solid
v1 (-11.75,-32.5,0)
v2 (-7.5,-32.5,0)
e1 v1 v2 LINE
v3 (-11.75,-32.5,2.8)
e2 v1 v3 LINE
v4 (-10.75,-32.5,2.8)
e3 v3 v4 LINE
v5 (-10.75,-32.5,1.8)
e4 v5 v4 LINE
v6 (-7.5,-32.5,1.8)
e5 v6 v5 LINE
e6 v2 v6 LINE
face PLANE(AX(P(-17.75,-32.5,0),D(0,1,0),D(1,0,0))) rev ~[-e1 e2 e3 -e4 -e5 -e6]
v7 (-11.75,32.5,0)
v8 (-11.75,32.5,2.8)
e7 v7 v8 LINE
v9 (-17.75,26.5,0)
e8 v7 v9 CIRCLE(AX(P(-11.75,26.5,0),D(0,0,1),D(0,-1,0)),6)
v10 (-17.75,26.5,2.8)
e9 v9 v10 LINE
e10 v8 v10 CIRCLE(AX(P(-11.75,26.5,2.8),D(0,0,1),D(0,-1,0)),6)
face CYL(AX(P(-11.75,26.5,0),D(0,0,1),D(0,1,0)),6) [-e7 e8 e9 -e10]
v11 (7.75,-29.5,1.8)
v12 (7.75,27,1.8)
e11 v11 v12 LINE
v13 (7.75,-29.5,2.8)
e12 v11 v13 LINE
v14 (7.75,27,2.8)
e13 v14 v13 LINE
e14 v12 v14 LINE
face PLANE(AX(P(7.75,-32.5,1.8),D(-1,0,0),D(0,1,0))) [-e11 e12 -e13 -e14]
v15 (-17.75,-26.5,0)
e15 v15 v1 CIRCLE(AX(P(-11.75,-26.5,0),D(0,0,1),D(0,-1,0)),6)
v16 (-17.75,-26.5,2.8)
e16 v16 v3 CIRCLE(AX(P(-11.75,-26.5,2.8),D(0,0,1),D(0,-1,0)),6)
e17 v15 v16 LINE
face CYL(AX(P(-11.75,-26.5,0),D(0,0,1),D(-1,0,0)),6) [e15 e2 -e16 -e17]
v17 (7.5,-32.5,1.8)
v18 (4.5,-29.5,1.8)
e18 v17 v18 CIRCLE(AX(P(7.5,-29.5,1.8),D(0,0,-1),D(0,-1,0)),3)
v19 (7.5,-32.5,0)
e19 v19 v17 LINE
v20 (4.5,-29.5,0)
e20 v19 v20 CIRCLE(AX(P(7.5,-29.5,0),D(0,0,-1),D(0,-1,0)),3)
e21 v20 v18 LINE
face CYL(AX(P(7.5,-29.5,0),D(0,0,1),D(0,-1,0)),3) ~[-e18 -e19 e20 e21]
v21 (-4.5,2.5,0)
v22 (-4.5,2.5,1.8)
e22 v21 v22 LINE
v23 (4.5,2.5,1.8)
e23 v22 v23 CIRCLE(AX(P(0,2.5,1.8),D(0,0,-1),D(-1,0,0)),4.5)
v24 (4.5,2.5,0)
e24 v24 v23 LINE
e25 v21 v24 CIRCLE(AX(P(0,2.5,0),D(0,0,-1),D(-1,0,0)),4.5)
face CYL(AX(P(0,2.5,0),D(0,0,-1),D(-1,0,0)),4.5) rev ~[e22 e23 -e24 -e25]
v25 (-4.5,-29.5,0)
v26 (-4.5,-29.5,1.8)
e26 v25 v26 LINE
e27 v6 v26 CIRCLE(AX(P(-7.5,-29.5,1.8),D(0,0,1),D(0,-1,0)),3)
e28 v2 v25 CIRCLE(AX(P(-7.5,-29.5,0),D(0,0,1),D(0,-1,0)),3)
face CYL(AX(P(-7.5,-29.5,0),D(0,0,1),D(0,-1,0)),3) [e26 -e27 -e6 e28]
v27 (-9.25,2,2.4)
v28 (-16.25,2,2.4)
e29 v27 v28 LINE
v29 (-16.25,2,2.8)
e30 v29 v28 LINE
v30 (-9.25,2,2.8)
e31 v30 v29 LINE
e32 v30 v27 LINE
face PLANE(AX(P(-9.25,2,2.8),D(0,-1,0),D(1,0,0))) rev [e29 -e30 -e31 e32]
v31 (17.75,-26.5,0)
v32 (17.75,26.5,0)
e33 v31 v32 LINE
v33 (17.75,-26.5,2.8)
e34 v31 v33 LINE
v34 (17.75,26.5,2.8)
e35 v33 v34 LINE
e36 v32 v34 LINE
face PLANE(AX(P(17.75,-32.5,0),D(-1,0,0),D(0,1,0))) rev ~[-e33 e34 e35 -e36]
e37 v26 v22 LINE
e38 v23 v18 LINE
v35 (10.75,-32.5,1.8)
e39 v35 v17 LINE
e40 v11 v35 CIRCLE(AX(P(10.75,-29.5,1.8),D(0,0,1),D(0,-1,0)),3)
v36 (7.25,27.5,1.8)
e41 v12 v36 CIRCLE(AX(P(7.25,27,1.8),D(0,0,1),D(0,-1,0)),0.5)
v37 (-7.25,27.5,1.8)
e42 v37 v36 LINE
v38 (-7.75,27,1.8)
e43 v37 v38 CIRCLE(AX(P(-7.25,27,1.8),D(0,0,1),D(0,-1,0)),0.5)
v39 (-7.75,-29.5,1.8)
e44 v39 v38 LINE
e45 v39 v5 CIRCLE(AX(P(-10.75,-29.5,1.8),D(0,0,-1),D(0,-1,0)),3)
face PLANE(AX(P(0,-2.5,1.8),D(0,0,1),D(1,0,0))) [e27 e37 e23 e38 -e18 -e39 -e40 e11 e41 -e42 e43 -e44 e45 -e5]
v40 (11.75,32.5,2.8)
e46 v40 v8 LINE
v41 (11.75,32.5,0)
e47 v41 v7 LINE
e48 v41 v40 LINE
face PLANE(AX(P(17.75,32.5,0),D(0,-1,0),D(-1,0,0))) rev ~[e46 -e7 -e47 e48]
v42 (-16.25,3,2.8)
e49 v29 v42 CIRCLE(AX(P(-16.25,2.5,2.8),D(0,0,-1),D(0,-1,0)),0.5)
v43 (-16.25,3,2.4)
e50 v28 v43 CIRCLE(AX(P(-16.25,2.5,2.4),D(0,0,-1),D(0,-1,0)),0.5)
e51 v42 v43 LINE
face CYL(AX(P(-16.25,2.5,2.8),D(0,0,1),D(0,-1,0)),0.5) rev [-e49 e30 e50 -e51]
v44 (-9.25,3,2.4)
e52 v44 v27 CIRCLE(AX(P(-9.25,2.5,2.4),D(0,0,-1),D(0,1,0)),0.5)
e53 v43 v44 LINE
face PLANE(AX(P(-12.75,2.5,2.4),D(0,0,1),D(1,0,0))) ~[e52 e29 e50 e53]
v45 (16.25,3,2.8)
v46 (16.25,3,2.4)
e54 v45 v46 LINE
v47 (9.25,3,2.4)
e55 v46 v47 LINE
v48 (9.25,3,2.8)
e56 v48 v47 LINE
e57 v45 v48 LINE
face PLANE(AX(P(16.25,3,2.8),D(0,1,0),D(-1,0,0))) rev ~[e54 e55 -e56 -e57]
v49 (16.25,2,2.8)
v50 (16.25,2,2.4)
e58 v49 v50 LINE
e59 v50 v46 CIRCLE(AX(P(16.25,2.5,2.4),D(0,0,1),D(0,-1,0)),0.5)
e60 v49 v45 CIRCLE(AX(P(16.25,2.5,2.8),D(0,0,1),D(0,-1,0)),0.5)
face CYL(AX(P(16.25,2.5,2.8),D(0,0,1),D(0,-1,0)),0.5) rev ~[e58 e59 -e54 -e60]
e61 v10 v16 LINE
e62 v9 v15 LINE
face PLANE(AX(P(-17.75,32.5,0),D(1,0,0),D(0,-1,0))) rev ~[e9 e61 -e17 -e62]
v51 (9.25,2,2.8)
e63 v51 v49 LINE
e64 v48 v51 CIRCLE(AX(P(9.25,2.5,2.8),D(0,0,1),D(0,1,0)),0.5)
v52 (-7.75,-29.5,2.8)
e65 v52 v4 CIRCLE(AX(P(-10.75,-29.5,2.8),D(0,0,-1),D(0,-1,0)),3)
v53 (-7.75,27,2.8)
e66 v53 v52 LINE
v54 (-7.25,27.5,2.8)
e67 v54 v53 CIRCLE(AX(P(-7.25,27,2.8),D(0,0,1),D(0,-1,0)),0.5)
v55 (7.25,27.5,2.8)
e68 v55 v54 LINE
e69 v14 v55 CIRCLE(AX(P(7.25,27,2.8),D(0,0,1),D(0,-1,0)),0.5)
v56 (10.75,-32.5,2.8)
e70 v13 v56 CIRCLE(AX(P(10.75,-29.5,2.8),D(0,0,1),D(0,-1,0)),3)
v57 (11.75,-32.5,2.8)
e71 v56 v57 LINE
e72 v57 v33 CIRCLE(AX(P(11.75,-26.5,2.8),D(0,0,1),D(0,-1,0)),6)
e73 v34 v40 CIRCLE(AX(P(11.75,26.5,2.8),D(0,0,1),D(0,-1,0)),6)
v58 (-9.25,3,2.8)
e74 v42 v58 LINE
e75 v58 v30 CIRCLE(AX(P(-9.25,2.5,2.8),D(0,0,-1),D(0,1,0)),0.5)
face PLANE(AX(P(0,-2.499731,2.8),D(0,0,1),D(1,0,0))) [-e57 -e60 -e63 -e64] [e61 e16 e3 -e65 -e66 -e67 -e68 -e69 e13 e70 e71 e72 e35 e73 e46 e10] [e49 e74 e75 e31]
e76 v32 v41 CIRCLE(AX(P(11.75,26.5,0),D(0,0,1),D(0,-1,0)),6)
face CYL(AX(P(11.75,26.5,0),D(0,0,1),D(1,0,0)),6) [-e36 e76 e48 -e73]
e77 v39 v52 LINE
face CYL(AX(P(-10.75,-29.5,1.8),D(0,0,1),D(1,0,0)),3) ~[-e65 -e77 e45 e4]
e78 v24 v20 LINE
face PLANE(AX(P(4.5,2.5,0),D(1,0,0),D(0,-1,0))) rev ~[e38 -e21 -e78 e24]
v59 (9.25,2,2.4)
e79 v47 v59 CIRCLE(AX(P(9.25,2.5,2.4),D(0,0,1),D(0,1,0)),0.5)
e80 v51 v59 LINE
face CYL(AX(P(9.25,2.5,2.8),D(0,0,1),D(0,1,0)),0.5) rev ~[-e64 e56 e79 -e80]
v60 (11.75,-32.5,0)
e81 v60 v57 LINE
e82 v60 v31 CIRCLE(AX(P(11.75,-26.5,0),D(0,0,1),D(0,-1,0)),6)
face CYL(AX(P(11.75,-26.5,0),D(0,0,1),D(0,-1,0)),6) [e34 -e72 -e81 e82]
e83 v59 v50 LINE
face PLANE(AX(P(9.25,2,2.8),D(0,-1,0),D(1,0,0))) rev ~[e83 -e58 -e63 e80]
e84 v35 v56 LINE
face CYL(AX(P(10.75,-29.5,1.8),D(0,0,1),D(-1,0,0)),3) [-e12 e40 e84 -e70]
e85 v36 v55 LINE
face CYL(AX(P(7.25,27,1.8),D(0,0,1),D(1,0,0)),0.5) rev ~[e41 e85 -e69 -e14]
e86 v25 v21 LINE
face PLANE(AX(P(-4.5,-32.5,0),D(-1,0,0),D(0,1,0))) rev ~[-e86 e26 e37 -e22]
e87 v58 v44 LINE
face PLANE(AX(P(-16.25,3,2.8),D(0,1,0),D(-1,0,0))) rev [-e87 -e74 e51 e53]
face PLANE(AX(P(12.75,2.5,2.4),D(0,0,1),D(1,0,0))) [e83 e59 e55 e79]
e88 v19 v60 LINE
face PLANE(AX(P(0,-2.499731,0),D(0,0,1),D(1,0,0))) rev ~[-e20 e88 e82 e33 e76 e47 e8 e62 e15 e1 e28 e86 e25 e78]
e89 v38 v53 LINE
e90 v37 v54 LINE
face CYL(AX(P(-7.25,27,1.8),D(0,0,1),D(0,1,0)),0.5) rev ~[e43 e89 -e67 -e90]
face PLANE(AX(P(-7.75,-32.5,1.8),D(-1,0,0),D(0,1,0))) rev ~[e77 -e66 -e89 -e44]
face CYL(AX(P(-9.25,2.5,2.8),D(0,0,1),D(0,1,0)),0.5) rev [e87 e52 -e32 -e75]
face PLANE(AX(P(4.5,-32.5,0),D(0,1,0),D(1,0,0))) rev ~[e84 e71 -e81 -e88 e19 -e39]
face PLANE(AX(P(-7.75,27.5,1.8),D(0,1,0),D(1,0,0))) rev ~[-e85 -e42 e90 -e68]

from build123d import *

# Parameters (mm, degrees)
F3_DEPTH = 2.8
F4_W     = 15.5
F4_H     = 60
F5_DEPTH = 25
F7_DEPTH = 0.4
F8_R     = 6
F9_R     = 0.5
F10_R    = 3


# Not quite as in the source:
# - a pattern or mirror of a feature is missing from the dataset's text; its kind, count and spacing are read off the source's solid


with BuildPart() as f3:
    # F2 (on Top) → F3 (new body)
    with BuildSketch(Plane.XY):
        with BuildLine():
            Line((4.5, -32.5), (17.75, -32.5))
            Line((17.75, -32.5), (17.75, 32.5))
            Line((17.75, 32.5), (-17.75, 32.5))
            Line((-17.75, 32.5), (-17.75, -32.5))
            Line((-17.75, -32.5), (-4.5, -32.5))
            Line((-4.5, -32.5), (-4.5, 2.5))
            ThreePointArc((-4.5, 2.5), (0, 7), (4.5, 2.5))
            Line((4.5, 2.5), (4.5, -32.5))
        make_face()
    extrude(amount=F3_DEPTH)

    # F4 (on offset) → F5 (cut)
    with BuildSketch(Plane.XY.offset(1.8)):
        with Locations((0, -2.5)):
            Rectangle(F4_W, F4_H)
    extrude(amount=F5_DEPTH, mode=Mode.SUBTRACT)

    # F6 (on face) → F7 (cut)
    with BuildSketch(Plane.XY.offset(2.8)):
        with BuildLine():
            Line((9.25, 2), (16.25, 2))
            ThreePointArc((16.25, 2), (16.75, 2.5), (16.25, 3))
            Line((16.25, 3), (9.25, 3))
            ThreePointArc((9.25, 3), (8.75, 2.5), (9.25, 2))
        make_face()
    f7 = extrude(amount=-F7_DEPTH, mode=Mode.SUBTRACT)

    # F7_copies: F7 across plane
    add(f7.mirror(Plane(origin=(0, 0, 0), x_dir=(0, 0, -1), z_dir=(-1, 0, 0))), mode=Mode.SUBTRACT)

    # F8
    f8_edges = [f3.edges().sort_by_distance(p)[0] for p in [
        (-17.75, -32.5, 1.4),
        (17.75, -32.5, 1.4),
        (-17.75, 32.5, 1.4),
        (17.75, 32.5, 1.4),
    ]]
    fillet(f8_edges, radius=F8_R)

    # F9
    f9_edges = [f3.edges().sort_by_distance(p)[0] for p in [
        (7.75, 27.5, 2.3),
        (-7.75, 27.5, 2.3),
    ]]
    fillet(f9_edges, radius=F9_R)

    # F10
    f10_edges = [f3.edges().sort_by_distance(p)[0] for p in [
        (7.75, -32.5, 2.3),
        (-7.75, -32.5, 2.3),
        (-4.5, -32.5, 0.9),
        (4.5, -32.5, 0.9),
    ]]
    fillet(f10_edges, radius=F10_R)


solid = f3.part
